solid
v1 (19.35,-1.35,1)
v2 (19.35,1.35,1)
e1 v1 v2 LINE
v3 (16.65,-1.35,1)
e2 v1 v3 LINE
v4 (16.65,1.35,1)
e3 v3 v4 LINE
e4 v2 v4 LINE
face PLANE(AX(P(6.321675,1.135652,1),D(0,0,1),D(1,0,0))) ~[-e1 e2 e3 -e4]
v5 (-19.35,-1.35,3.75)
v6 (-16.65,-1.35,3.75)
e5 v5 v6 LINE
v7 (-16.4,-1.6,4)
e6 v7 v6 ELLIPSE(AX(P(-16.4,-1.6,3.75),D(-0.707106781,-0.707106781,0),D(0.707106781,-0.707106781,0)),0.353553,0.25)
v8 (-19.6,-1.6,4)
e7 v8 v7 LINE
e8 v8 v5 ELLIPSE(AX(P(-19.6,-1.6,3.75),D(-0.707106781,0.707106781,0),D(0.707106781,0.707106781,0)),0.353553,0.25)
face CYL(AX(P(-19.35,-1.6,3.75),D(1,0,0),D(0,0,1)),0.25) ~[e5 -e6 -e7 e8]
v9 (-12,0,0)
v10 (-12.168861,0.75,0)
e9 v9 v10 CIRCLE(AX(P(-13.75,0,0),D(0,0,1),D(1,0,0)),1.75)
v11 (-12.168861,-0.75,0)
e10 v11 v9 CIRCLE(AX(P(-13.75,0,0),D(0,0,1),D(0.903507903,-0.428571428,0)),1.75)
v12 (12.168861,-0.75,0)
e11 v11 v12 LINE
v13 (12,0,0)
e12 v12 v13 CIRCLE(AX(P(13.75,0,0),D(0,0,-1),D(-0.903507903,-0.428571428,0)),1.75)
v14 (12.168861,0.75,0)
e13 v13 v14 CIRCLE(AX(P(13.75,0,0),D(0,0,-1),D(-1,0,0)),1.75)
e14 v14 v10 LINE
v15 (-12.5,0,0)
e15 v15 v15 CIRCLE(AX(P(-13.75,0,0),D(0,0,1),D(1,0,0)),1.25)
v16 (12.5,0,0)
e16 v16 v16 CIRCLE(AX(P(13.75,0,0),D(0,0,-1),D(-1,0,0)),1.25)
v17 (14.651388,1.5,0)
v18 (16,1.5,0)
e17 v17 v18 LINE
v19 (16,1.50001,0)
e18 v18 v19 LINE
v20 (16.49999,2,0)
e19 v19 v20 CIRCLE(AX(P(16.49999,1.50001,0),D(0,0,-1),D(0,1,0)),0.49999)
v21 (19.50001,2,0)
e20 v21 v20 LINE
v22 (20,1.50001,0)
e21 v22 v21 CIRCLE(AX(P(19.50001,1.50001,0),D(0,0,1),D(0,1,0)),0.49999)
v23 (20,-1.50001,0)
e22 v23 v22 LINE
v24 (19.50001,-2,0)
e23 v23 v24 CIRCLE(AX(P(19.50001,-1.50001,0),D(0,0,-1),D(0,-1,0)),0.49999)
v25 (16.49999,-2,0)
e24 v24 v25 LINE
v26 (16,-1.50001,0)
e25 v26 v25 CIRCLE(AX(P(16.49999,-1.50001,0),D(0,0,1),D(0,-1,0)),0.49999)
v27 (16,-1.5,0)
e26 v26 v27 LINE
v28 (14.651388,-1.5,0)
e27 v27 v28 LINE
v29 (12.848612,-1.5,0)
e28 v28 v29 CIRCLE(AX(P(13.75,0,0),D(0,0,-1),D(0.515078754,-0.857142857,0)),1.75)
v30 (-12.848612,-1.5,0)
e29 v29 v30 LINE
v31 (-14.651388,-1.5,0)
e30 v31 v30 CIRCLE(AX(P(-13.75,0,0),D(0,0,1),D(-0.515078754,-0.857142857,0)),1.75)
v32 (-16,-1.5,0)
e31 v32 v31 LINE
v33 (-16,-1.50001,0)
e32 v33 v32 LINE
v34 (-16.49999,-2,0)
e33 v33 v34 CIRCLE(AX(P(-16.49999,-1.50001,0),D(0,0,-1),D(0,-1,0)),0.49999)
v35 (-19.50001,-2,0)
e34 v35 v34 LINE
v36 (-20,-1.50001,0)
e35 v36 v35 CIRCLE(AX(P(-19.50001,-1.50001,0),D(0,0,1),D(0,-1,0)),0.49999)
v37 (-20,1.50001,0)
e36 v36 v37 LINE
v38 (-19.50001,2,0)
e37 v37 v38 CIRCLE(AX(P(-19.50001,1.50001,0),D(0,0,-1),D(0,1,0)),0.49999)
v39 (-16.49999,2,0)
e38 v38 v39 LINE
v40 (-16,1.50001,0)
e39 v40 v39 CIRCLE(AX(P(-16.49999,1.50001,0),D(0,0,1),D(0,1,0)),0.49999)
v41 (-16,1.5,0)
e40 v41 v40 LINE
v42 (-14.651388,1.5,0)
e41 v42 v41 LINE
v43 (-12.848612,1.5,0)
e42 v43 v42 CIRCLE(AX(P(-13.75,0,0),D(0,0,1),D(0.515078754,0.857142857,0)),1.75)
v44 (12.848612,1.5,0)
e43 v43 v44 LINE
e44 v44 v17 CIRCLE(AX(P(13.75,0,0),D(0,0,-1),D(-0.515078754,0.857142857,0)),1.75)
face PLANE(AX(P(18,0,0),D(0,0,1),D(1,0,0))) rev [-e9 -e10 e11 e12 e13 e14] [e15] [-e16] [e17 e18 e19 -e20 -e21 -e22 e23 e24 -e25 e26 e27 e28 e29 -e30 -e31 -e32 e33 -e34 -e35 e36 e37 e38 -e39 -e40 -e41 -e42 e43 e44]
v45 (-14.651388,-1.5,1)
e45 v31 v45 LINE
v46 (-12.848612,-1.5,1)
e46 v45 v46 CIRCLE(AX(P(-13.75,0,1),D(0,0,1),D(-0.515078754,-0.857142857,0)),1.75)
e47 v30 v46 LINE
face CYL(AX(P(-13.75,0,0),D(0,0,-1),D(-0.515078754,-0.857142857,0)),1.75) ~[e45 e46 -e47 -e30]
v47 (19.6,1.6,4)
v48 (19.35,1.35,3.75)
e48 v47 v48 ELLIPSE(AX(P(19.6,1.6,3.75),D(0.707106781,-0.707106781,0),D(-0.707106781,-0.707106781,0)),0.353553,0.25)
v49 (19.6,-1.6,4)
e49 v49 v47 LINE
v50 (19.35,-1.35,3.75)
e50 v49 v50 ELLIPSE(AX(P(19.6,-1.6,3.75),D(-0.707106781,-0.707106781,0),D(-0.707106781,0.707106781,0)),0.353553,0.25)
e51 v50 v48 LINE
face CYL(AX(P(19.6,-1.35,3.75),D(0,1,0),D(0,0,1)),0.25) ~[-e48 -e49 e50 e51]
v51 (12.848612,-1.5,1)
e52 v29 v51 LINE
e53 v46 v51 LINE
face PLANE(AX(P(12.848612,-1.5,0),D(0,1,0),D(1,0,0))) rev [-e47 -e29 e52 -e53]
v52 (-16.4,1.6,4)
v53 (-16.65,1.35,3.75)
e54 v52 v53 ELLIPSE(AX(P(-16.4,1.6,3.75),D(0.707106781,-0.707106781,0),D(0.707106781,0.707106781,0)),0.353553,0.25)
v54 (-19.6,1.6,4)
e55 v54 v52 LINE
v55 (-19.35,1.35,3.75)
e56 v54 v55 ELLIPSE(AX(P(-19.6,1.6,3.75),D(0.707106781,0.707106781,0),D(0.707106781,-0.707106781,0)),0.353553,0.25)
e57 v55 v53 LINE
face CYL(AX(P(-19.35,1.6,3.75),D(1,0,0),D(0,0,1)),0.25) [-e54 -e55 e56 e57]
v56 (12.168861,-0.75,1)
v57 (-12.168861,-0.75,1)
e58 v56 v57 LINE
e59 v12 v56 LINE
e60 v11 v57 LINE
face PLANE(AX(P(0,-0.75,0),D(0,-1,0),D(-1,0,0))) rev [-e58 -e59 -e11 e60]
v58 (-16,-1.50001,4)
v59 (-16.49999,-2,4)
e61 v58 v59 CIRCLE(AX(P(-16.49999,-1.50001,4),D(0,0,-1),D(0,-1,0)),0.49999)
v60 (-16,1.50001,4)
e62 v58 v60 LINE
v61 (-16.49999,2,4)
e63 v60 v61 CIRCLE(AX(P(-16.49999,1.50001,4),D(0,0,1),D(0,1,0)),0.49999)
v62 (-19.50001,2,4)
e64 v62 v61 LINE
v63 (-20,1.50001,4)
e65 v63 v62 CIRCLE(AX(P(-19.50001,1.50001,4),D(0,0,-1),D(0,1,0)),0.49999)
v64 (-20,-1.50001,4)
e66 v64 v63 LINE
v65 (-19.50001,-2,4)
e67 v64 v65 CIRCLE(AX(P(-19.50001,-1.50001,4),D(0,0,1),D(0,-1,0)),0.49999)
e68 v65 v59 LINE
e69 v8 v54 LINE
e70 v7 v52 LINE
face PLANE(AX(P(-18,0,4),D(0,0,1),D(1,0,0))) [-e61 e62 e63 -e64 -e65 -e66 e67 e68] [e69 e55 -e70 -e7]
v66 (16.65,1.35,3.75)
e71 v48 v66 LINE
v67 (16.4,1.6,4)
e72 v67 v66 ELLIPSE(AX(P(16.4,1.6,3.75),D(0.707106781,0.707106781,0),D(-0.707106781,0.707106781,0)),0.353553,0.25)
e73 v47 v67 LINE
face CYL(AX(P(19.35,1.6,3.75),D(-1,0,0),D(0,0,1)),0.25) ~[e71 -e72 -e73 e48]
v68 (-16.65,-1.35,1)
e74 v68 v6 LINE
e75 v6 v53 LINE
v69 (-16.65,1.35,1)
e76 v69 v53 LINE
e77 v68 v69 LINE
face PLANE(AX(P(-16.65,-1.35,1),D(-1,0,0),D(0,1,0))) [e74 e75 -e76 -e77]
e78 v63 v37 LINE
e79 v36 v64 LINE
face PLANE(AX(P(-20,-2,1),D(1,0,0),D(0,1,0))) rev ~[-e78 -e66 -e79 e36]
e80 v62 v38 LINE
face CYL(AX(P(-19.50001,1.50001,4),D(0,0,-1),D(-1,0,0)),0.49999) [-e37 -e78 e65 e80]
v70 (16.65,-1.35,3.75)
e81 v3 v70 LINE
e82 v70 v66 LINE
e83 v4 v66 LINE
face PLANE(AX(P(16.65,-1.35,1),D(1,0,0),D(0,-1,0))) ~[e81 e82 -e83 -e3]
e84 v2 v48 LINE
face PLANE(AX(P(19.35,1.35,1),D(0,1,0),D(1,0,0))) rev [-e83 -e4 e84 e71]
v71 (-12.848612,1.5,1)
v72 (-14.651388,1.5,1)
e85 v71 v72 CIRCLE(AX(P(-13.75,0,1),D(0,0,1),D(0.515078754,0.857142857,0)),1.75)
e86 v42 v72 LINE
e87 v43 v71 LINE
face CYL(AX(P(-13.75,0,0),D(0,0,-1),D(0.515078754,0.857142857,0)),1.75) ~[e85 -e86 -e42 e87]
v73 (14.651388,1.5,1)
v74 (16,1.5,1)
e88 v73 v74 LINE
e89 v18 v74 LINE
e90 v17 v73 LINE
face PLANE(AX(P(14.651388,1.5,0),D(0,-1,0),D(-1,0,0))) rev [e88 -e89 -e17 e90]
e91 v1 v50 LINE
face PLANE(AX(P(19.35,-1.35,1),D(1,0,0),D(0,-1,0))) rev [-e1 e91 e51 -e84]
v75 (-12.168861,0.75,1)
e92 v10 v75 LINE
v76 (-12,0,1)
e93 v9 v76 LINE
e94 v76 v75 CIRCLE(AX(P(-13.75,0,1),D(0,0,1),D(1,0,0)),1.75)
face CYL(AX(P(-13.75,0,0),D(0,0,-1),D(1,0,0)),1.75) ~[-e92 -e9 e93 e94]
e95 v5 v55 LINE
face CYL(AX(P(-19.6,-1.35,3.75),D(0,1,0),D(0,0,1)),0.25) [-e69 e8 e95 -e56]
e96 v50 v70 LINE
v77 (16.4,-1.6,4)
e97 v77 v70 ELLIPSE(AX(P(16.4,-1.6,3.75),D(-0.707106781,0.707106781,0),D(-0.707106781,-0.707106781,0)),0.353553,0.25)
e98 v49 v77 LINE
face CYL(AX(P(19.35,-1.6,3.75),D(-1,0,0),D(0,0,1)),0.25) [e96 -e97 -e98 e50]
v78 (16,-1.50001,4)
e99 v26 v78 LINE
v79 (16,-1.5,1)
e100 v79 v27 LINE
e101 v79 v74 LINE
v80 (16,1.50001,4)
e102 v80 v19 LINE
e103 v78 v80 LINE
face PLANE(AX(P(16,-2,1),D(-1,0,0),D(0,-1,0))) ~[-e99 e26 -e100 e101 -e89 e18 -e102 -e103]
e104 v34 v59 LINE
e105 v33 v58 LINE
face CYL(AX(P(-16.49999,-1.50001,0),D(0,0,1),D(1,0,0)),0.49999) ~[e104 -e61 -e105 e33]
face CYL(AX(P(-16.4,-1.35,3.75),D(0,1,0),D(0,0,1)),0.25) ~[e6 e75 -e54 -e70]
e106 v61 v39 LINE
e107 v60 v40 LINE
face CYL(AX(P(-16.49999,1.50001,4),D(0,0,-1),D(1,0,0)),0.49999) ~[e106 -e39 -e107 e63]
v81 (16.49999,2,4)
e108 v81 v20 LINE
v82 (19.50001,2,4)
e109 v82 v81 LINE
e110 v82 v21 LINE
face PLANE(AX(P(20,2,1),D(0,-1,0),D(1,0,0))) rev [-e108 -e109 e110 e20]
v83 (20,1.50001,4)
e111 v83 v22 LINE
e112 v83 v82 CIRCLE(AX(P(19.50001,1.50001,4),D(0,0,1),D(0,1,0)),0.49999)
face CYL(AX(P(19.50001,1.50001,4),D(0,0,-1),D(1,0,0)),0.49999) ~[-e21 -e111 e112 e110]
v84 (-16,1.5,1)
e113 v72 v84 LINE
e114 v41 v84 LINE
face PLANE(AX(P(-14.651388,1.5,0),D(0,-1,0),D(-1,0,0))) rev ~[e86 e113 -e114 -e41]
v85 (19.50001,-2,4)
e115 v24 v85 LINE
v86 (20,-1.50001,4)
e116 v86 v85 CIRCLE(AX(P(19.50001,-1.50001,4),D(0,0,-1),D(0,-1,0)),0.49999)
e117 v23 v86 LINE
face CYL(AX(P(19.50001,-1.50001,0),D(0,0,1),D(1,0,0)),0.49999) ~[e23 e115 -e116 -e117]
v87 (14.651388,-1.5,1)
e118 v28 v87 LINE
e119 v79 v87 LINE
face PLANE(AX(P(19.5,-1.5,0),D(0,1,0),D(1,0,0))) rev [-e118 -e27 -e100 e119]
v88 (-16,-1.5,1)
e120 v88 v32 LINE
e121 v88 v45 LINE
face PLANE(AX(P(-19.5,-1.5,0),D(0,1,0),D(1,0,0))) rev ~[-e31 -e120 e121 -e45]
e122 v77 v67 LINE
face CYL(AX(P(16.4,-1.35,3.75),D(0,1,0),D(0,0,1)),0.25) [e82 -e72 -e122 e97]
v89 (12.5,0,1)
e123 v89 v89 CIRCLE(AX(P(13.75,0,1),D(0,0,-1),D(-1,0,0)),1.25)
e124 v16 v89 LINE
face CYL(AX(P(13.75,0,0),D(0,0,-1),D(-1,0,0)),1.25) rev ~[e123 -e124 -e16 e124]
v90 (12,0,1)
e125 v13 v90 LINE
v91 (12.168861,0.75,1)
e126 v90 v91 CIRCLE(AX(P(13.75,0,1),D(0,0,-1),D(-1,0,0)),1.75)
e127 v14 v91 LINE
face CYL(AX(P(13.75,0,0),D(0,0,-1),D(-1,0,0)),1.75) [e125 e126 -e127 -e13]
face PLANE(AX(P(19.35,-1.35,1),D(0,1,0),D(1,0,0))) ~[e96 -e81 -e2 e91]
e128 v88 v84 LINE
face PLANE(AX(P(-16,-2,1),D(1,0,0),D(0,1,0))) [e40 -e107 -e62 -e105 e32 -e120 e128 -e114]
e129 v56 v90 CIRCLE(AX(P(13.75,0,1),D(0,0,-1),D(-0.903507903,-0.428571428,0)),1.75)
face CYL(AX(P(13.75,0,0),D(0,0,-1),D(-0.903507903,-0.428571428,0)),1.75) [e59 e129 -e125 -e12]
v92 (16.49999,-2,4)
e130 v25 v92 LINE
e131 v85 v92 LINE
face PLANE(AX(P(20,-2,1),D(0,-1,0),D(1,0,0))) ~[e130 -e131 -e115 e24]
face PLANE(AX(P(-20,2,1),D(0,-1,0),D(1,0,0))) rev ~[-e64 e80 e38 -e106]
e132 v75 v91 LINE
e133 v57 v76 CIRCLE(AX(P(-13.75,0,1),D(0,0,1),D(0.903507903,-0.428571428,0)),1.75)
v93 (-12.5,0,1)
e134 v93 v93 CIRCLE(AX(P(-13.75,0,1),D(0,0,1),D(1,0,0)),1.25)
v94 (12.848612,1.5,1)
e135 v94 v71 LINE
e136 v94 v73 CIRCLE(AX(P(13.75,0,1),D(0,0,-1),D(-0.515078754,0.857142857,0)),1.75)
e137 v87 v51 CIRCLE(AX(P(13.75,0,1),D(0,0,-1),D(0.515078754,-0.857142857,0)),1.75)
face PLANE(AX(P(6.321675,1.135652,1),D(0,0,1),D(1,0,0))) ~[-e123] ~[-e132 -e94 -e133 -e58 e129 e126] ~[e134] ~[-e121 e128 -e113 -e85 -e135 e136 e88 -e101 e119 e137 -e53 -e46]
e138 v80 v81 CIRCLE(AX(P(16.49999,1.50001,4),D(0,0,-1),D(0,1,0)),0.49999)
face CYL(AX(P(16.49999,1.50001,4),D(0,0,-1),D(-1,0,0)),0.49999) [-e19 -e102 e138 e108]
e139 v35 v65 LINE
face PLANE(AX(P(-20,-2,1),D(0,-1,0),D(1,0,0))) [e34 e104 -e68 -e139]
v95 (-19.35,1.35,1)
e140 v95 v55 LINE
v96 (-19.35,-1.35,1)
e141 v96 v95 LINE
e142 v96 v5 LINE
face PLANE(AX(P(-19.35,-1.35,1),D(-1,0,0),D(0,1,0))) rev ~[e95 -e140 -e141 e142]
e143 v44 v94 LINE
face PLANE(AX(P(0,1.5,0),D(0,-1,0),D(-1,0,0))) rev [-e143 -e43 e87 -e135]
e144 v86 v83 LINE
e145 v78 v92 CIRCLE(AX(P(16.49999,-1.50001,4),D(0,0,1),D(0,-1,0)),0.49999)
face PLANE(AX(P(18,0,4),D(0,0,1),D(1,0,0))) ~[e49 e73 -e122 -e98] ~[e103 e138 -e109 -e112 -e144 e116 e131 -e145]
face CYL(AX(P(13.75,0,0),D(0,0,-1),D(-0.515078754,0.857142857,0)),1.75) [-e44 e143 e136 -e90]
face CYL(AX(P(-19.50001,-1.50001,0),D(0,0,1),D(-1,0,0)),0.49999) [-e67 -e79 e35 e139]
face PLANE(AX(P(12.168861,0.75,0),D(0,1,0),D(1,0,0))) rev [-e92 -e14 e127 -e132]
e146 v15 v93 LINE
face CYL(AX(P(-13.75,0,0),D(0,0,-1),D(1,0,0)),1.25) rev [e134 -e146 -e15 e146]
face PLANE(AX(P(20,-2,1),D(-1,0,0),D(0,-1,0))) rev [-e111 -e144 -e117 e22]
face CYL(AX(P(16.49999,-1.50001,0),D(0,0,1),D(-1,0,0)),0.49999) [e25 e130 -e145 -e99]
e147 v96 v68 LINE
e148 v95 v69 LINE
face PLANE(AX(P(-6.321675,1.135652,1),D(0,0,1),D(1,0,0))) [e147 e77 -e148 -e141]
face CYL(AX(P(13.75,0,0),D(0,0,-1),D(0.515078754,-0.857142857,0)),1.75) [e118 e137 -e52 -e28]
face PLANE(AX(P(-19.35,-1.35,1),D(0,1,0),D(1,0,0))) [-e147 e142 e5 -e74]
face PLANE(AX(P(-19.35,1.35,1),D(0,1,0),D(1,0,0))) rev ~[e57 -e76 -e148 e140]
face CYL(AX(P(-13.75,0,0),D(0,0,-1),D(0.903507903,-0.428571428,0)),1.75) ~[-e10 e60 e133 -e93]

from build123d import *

# Parameters (mm, degrees)
F0_R          = 1.25
F1_DEPTH      = 1
F2_W          = 4
F2_H          = 4
F2_W_2        = 2.7
F2_H_2        = 2.7
F3_DEPTH      = 3
F3_DEPTH_BACK = 1
F4_R          = 0.49999
F5_R          = 0.25


# Not quite as in the source:
# - a fillet or chamfer is up to 0.001 mm smaller than in the source, because OpenCascade refuses the exact size


with BuildPart() as f1:
    # F0 (on Top) → F1 (new body)
    with BuildSketch(Plane.XY):
        with BuildLine():
            Line((0, 0.75), (0, 1.5))
            Line((0, 1.5), (-12.8486121811, 1.5))
            ThreePointArc((-12.8486121811, 1.5), (-12.4533274736, 1.1752192814), (-12.1688611699, 0.75))
            Line((-12.1688611699, 0.75), (0, 0.75))
        make_face()
        with BuildLine():
            ThreePointArc((-12.1688611699, 0.75), (-12.4533274736, 1.1752192814), (-12.8486121811, 1.5))
            Line((-12.8486121811, 1.5), (-14.6513878189, 1.5))
            ThreePointArc((-14.6513878189, 1.5), (-15.5, 0), (-14.6513878189, -1.5))
            Line((-14.6513878189, -1.5), (-12.8486121811, -1.5))
            ThreePointArc((-12.8486121811, -1.5), (-12.4533274736, -1.1752192814), (-12.1688611699, -0.75))
            ThreePointArc((-12.1688611699, -0.75), (-12.0427371391, -0.3843872054), (-12, 0))
            ThreePointArc((-12, 0), (-12.0427371391, 0.3843872054), (-12.1688611699, 0.75))
        make_face()
        with Locations((-13.75, 0)):
            Circle(F0_R, mode=Mode.SUBTRACT)
        with BuildLine():
            Line((-14.6513878189, 1.5), (-12.8486121811, 1.5))
            ThreePointArc((-12.8486121811, 1.5), (-13.75, 1.75), (-14.6513878189, 1.5))
        make_face()
        with BuildLine():
            ThreePointArc((-14.6513878189, -1.5), (-15.5, 0), (-14.6513878189, 1.5))
            Line((-14.6513878189, 1.5), (-19.5, 1.5))
            Line((-19.5, 1.5), (-19.5, -1.5))
            Line((-19.5, -1.5), (-14.6513878189, -1.5))
        make_face()
        with BuildLine():
            Line((-12.8486121811, -1.5), (-14.6513878189, -1.5))
            ThreePointArc((-14.6513878189, -1.5), (-13.75, -1.75), (-12.8486121811, -1.5))
        make_face()
        with BuildLine():
            ThreePointArc((-12.1688611699, -0.75), (-12.4533274736, -1.1752192814), (-12.8486121811, -1.5))
            Line((-12.8486121811, -1.5), (0, -1.5))
            Line((0, -1.5), (0, -0.75))
            Line((0, -0.75), (-12.1688611699, -0.75))
        make_face()
    extrude(amount=F1_DEPTH)

    # F2 (on face) → F3 (join, two sides)
    with BuildSketch(Plane.XY.offset(1)) as f3_sk:
        with Locations((-18, 0)):
            Rectangle(F2_W, F2_H)
        with Locations((-18, 0)):
            Rectangle(F2_W_2, F2_H_2, mode=Mode.SUBTRACT)
    extrude(amount=F3_DEPTH)
    extrude(f3_sk.sketch, amount=-F3_DEPTH_BACK)

    # F4 (radius 0.5 in the source; OpenCascade refuses exactly that, so slightly less here)
    f4_edges = [f1.edges().sort_by_distance(p)[0] for p in [
        (-16, -2, 2),
        (-20, -2, 2),
        (-16, 2, 2),
        (-20, 2, 2),
    ]]
    fillet(f4_edges, radius=F4_R)

    # F5
    f5_edges = [f1.edges().sort_by_distance(p)[0] for p in [
        (-18, -1.35, 4),
        (-16.65, 0, 4),
        (-18, 1.35, 4),
        (-19.35, 0, 4),
    ]]
    fillet(f5_edges, radius=F5_R)

    # F6: F1 across plane


with BuildPart() as f1_1:
    add(f1.part)
    add(f1.part.mirror(Plane.YZ))


solid = f1_1.part
